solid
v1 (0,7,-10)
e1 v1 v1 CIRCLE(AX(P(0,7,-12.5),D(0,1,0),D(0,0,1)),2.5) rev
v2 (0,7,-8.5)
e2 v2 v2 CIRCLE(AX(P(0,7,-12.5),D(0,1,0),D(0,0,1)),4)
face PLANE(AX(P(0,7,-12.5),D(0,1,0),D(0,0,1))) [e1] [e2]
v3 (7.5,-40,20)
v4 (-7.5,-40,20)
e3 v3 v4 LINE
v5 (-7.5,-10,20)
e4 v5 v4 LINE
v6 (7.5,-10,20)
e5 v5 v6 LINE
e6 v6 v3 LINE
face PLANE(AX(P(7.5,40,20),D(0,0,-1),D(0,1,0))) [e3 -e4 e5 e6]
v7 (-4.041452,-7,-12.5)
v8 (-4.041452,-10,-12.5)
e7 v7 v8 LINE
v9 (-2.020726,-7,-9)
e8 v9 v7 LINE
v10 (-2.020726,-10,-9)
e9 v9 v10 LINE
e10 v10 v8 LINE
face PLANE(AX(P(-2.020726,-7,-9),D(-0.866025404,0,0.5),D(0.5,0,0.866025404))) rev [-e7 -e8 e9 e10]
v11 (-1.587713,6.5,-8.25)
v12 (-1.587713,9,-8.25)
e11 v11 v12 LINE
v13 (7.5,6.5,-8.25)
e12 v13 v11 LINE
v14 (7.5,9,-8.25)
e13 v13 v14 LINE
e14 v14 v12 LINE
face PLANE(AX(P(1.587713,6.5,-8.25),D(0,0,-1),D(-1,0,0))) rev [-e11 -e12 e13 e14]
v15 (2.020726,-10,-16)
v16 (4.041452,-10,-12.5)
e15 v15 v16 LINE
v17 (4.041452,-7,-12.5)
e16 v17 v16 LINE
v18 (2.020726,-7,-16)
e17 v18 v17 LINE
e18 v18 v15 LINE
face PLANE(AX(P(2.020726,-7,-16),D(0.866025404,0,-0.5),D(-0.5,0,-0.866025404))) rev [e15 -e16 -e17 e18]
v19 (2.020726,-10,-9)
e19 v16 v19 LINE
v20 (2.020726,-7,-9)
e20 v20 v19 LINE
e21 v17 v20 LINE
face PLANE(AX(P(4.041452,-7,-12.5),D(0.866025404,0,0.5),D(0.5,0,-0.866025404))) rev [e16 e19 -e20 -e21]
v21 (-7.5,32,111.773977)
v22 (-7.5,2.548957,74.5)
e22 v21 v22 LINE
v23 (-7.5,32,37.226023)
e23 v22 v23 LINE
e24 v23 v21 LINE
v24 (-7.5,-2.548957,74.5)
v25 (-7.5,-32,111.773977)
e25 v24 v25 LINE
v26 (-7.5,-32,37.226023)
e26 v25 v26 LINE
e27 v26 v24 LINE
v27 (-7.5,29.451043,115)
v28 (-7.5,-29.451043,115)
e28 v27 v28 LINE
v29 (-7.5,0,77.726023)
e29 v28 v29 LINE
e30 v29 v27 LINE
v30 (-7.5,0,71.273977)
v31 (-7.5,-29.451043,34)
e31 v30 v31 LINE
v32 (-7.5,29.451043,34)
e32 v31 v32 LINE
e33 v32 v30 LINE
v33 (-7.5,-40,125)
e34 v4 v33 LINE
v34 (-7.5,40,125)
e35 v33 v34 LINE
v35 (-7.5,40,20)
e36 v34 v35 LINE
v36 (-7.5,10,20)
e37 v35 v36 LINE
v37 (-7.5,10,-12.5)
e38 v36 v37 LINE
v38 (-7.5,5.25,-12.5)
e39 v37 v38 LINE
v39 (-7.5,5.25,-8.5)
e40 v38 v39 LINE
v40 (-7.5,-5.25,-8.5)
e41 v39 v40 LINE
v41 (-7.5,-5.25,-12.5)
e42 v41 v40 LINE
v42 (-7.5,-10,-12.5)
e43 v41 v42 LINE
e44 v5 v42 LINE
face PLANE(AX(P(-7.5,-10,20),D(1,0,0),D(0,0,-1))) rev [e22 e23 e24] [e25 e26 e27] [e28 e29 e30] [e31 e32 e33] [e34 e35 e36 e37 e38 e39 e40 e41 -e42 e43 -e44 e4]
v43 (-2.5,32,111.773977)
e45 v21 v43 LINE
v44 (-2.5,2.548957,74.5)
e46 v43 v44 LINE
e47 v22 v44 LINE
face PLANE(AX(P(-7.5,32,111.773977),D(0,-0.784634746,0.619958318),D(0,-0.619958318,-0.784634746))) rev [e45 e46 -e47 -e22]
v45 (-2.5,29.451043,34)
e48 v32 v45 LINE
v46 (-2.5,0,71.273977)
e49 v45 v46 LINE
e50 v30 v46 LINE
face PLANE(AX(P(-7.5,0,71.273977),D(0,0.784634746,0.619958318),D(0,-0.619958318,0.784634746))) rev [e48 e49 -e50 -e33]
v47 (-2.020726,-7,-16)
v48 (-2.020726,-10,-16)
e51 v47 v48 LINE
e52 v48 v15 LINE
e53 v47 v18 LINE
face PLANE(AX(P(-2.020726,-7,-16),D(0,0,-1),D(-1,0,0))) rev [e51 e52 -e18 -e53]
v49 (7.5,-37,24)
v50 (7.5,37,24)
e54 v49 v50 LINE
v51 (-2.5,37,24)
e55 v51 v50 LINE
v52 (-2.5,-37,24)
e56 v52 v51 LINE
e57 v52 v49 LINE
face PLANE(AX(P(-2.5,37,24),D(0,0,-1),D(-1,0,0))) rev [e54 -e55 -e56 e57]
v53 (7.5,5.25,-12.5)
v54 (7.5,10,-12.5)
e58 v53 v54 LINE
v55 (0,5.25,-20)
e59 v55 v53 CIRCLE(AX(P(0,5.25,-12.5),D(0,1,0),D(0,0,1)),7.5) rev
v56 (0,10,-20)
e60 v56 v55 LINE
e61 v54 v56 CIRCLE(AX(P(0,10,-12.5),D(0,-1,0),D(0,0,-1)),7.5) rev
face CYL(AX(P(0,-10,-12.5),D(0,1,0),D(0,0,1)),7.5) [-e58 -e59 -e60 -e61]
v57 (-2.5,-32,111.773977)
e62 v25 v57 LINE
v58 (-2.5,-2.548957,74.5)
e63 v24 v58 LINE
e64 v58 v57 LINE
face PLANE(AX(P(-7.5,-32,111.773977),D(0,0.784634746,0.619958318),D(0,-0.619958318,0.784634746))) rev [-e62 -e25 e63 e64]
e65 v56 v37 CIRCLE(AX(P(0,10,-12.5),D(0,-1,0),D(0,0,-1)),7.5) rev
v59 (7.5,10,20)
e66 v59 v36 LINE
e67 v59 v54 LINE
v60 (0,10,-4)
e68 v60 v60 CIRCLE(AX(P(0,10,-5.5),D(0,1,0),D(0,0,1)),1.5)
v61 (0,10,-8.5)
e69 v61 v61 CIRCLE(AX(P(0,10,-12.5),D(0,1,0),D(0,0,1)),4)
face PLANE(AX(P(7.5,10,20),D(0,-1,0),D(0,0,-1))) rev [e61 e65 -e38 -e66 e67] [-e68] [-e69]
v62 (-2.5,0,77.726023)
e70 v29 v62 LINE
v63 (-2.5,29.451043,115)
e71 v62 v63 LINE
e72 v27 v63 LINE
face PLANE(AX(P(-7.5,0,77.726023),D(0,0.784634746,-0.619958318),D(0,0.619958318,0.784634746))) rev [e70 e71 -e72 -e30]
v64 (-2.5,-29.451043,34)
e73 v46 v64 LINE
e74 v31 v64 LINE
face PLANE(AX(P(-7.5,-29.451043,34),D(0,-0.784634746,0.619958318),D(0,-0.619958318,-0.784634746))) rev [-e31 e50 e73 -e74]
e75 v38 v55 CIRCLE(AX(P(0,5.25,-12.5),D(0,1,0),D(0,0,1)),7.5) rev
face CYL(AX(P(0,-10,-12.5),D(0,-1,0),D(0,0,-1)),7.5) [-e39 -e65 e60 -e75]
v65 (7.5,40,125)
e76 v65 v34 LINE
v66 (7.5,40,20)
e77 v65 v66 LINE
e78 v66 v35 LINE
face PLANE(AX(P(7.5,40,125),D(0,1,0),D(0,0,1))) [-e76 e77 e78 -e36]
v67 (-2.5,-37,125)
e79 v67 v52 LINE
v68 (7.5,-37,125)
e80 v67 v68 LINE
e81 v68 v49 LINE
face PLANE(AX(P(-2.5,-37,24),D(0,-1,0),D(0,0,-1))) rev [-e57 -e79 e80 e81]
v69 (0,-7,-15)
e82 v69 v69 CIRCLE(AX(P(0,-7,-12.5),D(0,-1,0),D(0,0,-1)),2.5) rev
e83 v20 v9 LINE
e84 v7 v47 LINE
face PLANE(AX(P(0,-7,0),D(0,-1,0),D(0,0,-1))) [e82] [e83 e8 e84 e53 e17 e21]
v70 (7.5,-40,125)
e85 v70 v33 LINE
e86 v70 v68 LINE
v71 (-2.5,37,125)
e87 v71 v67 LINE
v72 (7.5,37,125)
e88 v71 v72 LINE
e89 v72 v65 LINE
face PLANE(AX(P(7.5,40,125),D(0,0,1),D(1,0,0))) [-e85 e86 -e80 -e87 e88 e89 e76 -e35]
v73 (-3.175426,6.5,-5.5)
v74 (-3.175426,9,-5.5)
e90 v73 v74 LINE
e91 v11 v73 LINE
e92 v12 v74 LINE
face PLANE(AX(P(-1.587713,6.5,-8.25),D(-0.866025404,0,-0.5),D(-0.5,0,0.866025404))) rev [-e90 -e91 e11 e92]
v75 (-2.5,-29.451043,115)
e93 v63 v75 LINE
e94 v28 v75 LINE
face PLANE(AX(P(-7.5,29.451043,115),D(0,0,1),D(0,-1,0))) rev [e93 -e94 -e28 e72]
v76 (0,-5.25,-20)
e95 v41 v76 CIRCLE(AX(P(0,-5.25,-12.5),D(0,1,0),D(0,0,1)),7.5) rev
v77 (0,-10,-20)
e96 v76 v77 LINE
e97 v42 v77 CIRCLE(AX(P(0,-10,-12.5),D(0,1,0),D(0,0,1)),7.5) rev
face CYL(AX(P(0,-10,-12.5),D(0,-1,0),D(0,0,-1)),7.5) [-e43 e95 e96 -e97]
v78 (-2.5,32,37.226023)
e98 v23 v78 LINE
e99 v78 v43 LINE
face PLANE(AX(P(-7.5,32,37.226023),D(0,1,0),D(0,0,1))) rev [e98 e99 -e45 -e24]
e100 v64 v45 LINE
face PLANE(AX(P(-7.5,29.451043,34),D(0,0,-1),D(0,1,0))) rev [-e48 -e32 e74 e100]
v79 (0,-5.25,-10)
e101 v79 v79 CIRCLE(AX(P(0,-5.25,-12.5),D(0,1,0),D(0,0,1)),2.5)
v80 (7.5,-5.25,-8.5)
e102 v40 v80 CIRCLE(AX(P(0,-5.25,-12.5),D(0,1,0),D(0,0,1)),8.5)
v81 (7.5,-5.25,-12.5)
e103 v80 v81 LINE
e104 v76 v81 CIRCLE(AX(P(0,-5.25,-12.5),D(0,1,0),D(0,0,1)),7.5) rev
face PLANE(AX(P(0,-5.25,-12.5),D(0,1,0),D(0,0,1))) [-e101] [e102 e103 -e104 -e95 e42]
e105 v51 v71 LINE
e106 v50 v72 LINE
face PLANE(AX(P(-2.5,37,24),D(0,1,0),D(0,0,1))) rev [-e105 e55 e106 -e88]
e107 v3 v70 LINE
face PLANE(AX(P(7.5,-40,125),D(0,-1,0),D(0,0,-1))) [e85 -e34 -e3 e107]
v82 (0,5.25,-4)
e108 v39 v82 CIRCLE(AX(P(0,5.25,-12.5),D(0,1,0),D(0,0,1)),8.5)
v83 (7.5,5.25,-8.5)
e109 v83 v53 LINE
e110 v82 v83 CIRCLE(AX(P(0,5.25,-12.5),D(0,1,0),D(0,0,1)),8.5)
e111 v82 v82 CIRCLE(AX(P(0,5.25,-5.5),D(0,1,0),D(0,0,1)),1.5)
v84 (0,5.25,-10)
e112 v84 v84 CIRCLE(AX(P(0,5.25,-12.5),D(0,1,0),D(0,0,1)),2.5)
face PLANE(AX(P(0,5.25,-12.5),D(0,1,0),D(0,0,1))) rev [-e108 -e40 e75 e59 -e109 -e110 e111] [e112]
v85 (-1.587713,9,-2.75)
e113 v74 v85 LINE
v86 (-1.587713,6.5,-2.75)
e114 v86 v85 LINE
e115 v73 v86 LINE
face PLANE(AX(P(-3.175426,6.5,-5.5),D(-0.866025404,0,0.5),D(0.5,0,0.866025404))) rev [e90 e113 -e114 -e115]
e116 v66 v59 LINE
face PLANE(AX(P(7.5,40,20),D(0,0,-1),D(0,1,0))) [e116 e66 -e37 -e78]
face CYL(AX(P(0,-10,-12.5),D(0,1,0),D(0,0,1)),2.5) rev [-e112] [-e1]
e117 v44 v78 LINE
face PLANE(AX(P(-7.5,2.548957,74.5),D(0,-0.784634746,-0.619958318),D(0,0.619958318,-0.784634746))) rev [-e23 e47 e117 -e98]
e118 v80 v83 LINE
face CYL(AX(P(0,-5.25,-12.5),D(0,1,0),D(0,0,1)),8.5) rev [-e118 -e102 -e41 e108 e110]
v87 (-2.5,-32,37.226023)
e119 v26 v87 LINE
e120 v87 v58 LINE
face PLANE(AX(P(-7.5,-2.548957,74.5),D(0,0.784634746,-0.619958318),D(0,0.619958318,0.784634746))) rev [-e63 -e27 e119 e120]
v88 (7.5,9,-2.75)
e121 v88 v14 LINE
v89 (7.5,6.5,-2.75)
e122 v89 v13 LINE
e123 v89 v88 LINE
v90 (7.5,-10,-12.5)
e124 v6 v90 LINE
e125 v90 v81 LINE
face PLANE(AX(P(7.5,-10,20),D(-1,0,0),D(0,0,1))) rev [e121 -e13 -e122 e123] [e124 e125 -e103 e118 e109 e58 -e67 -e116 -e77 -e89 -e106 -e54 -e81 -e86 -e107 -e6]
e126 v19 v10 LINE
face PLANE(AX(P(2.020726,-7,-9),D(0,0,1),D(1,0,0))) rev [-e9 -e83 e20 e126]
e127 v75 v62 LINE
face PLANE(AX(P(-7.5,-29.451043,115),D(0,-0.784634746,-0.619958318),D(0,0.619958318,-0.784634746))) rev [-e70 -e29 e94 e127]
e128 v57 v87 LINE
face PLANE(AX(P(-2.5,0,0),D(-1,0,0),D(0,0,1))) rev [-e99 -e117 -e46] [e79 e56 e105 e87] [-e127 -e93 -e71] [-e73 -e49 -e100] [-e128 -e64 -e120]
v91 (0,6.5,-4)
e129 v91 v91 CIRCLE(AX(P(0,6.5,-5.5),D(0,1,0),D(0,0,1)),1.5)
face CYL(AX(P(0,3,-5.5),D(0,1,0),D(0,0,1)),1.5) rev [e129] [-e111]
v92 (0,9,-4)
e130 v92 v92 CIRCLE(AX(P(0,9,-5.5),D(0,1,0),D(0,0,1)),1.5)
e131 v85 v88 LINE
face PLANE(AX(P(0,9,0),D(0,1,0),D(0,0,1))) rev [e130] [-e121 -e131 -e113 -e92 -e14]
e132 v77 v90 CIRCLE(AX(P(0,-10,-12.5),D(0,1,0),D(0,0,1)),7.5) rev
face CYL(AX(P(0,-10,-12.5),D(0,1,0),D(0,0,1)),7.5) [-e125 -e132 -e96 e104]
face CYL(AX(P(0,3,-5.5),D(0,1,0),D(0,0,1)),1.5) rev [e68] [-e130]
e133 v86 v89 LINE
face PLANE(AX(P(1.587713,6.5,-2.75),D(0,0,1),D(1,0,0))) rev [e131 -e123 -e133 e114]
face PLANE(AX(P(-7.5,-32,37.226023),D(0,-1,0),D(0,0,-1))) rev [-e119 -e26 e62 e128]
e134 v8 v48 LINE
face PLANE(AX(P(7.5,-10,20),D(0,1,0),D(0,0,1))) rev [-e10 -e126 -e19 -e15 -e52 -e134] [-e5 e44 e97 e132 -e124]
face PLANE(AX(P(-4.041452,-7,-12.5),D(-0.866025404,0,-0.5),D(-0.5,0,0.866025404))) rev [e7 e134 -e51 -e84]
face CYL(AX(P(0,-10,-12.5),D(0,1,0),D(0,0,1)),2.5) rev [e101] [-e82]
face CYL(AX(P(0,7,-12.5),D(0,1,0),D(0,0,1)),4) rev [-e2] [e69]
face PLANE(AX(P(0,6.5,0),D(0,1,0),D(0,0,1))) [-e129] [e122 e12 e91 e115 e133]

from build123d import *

# Parameters (mm, degrees)
SKETCH1_W           = 15
SKETCH1_H           = 20
BOSS_EXTRUDE1_DEPTH = 20
FILLET1_R           = 7.5
CUT_EXTRUDE1_START  = -4.75
SKETCH3_R           = 8.5
CUT_EXTRUDE1_DEPTH  = 10.5
SKETCH4_R           = 2.5
CUT_EXTRUDE2_DEPTH  = 30.261749777
CUT_EXTRUDE3_DEPTH  = 3
SKETCH6_R           = 4
CUT_EXTRUDE4_DEPTH  = 3
SKETCH7_W           = 105
SKETCH7_H           = 80
BOSS_EXTRUDE2_DEPTH = 15
SKETCH9_W           = 101
SKETCH9_H           = 74
CUT_EXTRUDE5_DEPTH  = 10
CUT_EXTRUDE6_DEPTH  = 132.624465811
CUT_EXTRUDE7_START  = -1
CUT_EXTRUDE7_DEPTH  = 2.5
SKETCH13_R          = 1.5
CUT_EXTRUDE8_DEPTH  = 7


with BuildPart() as part:
    # Sketch1 → Boss-Extrude1 (new, symmetric)
    with BuildSketch(Plane.XY):
        Rectangle(SKETCH1_W, SKETCH1_H)
    extrude(amount=BOSS_EXTRUDE1_DEPTH, both=True)

    # Fillet1
    fillet1_edges = [part.edges().sort_by_distance(p)[0] for p in [
        (-7.5, 0, -20),
        (7.5, 0, -20),
    ]]
    fillet(fillet1_edges, radius=FILLET1_R - 0.0001)  # a hair under: the kernel refuses the full size

    # Sketch3 → Cut-Extrude1 (cut)
    with BuildSketch(Plane(origin=(0, 10, 0), x_dir=(1, 0, 0), z_dir=(0, 1, 0)).offset(CUT_EXTRUDE1_START)):
        with Locations((0, 12.5)):
            Circle(SKETCH3_R)
    extrude(amount=-CUT_EXTRUDE1_DEPTH, mode=Mode.SUBTRACT)

    # Sketch4 → Cut-Extrude2 (cut, through all)
    with BuildSketch(Plane(origin=(0, 10, 0), x_dir=(1, 0, 0), z_dir=(0, 1, 0))):
        with Locations(Location((0, 12.5, 0), (0, 0, 270))):
            Circle(SKETCH4_R)
    extrude(amount=-CUT_EXTRUDE2_DEPTH, mode=Mode.SUBTRACT)

    # Sketch5 → Cut-Extrude3 (cut)
    with BuildSketch(Plane(origin=(0, -10, 0), x_dir=(-1, 0, 0), z_dir=(0, -1, 0))):
        Polygon((-2.020725942, 16), (-4.041451884, 12.5), (-2.020725942, 9), (2.020725942, 9), (4.041451884, 12.5), (2.020725942, 16), align=None)
    extrude(amount=-CUT_EXTRUDE3_DEPTH, mode=Mode.SUBTRACT)

    # Sketch6 → Cut-Extrude4 (cut)
    with BuildSketch(Plane(origin=(0, 10, 0), x_dir=(1, 0, 0), z_dir=(0, 1, 0))):
        with Locations(Location((0, 12.5, 0), (0, 0, 270))):
            Circle(SKETCH6_R)
    extrude(amount=-CUT_EXTRUDE4_DEPTH, mode=Mode.SUBTRACT)

    # Sketch7 → Boss-Extrude2 (add)
    with BuildSketch(Plane.ZY.offset(7.5)):
        with Locations((72.5, 0)):
            Rectangle(SKETCH7_W, SKETCH7_H)
    extrude(amount=-BOSS_EXTRUDE2_DEPTH)

    # Sketch9 → Cut-Extrude5 (cut)
    with BuildSketch(Plane(origin=(7.5, 0, 0), x_dir=(0, 0, -1), z_dir=(1, 0, 0))):
        with Locations((-74.5, 0)):
            Rectangle(SKETCH9_W, SKETCH9_H)
    extrude(amount=-CUT_EXTRUDE5_DEPTH, mode=Mode.SUBTRACT)

    # Sketch10 → Cut-Extrude6 (cut, through all)
    with BuildSketch(Plane(origin=(-2.5, 0, 0), x_dir=(0, 0, -1), z_dir=(1, 0, 0))):
        Polygon((-111.773976664, -32), (-74.5, -2.54895671), (-37.226023336, -32), align=None)
        Polygon((-115, -29.45104329), (-77.726023336, 0), (-115, 29.45104329), align=None)
        Polygon((-37.226023336, 32), (-111.773976664, 32), (-74.5, 2.54895671), align=None)
        Polygon((-71.273976664, 0), (-34, 29.45104329), (-34, -29.45104329), align=None)
    extrude(amount=-CUT_EXTRUDE6_DEPTH, mode=Mode.SUBTRACT)

    # Sketch12 → Cut-Extrude7 (cut)
    with BuildSketch(Plane(origin=(0, 10, 0), x_dir=(1, 0, 0), z_dir=(0, 1, 0)).offset(CUT_EXTRUDE7_START)):
        Polygon((-1.58771324, 8.25), (-3.175426481, 5.5), (-1.58771324, 2.75), (1.58771324, 2.75), (7.5, 2.75), (7.5, 8.25), (1.58771324, 8.25), align=None)
    extrude(amount=-CUT_EXTRUDE7_DEPTH, mode=Mode.SUBTRACT)

    # Sketch13 → Cut-Extrude8 (cut)
    with BuildSketch(Plane(origin=(0, 10, 0), x_dir=(1, 0, 0), z_dir=(0, 1, 0))):
        with Locations(Location((0, 5.5, 0), (0, 0, 270))):
            Circle(SKETCH13_R)
    extrude(amount=-CUT_EXTRUDE8_DEPTH, mode=Mode.SUBTRACT)


solid = part.part
